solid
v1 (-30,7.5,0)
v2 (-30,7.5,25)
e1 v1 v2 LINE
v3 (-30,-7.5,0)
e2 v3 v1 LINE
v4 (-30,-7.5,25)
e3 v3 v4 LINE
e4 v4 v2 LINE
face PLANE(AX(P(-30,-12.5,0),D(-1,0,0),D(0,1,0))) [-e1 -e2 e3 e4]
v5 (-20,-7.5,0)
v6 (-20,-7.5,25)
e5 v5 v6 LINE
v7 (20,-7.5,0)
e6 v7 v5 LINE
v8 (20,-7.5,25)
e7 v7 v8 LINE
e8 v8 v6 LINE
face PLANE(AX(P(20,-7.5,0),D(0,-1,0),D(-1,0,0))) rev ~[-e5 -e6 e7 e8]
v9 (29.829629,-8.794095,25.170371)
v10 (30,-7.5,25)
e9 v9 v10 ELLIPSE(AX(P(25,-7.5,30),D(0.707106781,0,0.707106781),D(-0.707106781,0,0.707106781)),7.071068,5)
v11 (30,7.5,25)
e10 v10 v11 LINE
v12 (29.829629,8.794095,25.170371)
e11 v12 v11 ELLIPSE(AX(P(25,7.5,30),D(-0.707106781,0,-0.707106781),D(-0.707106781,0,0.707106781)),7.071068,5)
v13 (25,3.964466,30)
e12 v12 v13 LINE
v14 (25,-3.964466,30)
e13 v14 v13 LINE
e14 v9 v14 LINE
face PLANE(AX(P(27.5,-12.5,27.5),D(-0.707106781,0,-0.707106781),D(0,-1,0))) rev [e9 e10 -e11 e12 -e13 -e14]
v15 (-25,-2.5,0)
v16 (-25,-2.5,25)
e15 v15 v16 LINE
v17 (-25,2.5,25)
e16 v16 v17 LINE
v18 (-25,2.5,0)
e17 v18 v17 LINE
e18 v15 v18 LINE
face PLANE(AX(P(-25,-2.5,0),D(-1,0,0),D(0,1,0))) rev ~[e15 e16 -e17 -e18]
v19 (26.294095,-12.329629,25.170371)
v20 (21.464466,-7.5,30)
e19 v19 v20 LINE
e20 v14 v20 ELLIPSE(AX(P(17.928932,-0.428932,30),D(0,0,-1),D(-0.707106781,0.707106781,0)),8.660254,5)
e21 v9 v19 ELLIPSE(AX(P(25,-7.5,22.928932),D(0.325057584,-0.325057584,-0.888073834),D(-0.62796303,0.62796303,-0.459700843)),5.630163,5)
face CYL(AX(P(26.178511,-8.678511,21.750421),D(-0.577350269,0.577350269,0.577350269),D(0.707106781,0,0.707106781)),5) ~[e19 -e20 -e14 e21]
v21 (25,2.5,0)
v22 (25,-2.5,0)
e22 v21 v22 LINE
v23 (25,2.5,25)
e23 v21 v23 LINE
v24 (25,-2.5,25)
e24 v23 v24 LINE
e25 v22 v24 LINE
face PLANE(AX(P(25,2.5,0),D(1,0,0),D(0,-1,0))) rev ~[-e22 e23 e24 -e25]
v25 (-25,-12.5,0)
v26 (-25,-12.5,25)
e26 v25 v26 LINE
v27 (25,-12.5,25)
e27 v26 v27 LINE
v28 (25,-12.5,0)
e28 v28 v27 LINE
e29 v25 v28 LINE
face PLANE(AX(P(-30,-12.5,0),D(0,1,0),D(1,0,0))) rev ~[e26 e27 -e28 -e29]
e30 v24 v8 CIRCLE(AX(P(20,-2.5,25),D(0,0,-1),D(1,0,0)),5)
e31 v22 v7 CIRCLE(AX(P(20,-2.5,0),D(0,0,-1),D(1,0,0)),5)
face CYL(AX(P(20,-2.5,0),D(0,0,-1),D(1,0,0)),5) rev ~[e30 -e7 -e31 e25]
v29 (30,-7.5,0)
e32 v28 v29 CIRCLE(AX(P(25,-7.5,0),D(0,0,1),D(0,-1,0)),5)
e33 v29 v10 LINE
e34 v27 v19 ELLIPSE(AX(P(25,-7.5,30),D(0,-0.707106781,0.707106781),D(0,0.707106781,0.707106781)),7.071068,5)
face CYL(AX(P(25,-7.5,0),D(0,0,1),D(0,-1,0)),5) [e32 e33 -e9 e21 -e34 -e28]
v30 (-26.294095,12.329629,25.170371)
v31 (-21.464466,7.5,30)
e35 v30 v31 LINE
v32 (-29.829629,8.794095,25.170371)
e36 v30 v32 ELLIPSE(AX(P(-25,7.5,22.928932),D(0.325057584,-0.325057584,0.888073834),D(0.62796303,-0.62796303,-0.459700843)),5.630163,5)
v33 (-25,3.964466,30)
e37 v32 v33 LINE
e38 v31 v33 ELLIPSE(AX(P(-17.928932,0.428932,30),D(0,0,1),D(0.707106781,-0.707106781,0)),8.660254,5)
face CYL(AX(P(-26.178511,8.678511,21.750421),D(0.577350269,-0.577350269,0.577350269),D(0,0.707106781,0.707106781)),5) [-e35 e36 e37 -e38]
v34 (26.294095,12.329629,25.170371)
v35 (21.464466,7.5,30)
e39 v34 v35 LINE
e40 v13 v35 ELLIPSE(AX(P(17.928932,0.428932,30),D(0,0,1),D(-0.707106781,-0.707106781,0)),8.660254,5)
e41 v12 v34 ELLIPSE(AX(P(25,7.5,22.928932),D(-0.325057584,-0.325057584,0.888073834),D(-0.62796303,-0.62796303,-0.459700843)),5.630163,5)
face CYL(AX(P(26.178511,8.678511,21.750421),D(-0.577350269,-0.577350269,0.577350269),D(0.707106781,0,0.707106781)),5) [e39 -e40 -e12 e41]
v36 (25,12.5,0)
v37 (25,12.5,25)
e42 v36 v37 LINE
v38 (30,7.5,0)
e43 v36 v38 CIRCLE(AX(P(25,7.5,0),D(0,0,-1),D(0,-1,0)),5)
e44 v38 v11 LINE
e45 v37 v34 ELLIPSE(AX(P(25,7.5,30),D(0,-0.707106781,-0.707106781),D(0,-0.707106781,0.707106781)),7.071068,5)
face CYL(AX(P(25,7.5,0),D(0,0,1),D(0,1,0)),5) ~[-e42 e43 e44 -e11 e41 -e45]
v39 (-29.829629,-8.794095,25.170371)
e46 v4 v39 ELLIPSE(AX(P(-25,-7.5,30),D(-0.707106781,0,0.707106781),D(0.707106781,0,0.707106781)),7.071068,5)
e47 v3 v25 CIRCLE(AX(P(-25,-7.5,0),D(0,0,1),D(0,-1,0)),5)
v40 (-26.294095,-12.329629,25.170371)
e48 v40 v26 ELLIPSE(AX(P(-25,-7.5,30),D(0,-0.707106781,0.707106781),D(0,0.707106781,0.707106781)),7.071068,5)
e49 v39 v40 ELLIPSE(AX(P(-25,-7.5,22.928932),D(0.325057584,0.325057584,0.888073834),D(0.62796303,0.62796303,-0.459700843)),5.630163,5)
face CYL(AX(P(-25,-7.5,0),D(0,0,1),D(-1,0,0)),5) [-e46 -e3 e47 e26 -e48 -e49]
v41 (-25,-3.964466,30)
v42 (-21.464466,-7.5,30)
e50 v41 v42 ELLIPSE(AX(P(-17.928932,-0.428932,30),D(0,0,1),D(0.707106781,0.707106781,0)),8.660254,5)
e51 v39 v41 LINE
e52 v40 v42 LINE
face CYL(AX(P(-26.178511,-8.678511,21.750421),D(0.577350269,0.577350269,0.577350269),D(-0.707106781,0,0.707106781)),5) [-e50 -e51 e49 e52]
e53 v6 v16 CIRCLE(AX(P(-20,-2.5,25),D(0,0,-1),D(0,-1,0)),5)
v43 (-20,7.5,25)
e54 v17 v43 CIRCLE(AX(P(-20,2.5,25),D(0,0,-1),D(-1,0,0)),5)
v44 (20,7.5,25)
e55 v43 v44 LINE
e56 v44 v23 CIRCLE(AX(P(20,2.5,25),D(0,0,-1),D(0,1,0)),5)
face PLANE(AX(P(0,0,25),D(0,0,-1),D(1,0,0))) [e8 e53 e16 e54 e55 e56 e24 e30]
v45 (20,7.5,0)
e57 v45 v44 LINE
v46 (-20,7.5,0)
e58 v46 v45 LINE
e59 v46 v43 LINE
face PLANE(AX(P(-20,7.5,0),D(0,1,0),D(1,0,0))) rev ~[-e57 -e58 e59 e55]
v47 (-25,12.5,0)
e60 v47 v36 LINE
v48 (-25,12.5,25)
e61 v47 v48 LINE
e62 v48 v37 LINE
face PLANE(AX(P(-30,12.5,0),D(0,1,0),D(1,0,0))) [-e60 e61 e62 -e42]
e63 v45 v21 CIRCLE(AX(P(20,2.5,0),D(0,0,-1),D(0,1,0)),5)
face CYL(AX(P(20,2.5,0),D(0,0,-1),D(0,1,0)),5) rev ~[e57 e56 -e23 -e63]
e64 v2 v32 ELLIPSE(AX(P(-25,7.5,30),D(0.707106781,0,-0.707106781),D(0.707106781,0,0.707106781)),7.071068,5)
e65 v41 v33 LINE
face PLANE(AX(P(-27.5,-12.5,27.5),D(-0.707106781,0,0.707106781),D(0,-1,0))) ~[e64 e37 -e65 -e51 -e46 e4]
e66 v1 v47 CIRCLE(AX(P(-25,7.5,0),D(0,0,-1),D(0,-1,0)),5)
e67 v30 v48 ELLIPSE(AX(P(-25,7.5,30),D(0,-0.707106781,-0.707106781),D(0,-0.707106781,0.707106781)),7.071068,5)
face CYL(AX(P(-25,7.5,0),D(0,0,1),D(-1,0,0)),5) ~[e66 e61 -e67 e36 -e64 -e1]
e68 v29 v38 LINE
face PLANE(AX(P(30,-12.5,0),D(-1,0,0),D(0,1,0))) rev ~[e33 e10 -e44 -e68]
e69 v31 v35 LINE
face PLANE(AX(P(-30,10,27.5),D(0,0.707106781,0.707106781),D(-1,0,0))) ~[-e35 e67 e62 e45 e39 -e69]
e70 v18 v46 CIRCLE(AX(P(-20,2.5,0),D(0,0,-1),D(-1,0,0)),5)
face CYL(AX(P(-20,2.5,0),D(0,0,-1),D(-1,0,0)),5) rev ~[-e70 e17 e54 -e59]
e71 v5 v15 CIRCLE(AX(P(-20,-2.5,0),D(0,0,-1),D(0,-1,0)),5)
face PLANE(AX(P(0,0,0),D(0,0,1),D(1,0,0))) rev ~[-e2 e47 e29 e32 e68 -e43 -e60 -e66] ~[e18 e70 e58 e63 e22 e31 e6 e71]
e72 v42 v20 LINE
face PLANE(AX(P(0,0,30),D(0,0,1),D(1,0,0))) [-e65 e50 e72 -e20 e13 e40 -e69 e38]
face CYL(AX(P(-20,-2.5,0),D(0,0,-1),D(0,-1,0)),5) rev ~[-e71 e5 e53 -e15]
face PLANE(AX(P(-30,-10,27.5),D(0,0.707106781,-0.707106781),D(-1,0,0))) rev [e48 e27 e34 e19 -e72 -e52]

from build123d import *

# Parameters (mm, degrees)
F0_W     = 60
F0_H     = 25
F1_DEPTH = 30
F2_SIZE  = 5
F3_F1_R  = 5
F3_F2_R  = 5
F3_F3_R  = 5
F3_F4_R  = 5
F3_F5_R  = 5
F3_F6_R  = 5
F3_F7_R  = 5
F3_F8_R  = 5
F5_DEPTH = 25


with BuildPart() as f1:
    # F0 (on Top) → F1 (new body)
    with BuildSketch(Plane.XY):
        Rectangle(F0_W, F0_H)
    extrude(amount=F1_DEPTH)

    # F2
    f2_edges = [f1.edges().sort_by_distance(p)[0] for p in [
        (-30, 0, 30),
        (0, -12.5, 30),
        (30, 0, 30),
        (0, 12.5, 30),
    ]]
    chamfer(f2_edges, length=F2_SIZE)

    # F3: fillet of radius 5 on 8 edges, made by hand

    # F3_f1
    f3_f1_edges = [f1.edges().sort_by_distance(p)[0] for p in [
        (-30, 12.5, 12.5),
    ]]
    fillet(f3_f1_edges, radius=F3_F1_R)

    # F3_f2
    f3_f2_edges = [f1.edges().sort_by_distance(p)[0] for p in [
        (-30, -12.5, 12.5),
    ]]
    fillet(f3_f2_edges, radius=F3_F2_R)

    # F3_f3
    f3_f3_edges = [f1.edges().sort_by_distance(p)[0] for p in [
        (30, 12.5, 12.5),
    ]]
    fillet(f3_f3_edges, radius=F3_F3_R)

    # F3_f4
    f3_f4_edges = [f1.edges().sort_by_distance(p)[0] for p in [
        (-26.767766953, 9.267766953, 28.232233047),
    ]]
    fillet(f3_f4_edges, radius=F3_F4_R)

    # F3_f5
    f3_f5_edges = [f1.edges().sort_by_distance(p)[0] for p in [
        (-26.767766953, -9.267766953, 28.232233047),
    ]]
    fillet(f3_f5_edges, radius=F3_F5_R)

    # F3_f6
    f3_f6_edges = [f1.edges().sort_by_distance(p)[0] for p in [
        (30, -12.5, 12.5),
    ]]
    fillet(f3_f6_edges, radius=F3_F6_R)

    # F3_f7
    f3_f7_edges = [f1.edges().sort_by_distance(p)[0] for p in [
        (26.767766953, 9.267766953, 28.232233047),
    ]]
    fillet(f3_f7_edges, radius=F3_F7_R)

    # F3_f8
    f3_f8_edges = [f1.edges().sort_by_distance(p)[0] for p in [
        (26.767766953, -9.267766953, 28.232233047),
    ]]
    fillet(f3_f8_edges, radius=F3_F8_R)

    # F4 (on face) → F5 (cut)
    with BuildSketch(Plane(origin=(0, 0, 0), x_dir=(1, 0, 0), z_dir=(0, 0, -1))):
        with BuildLine():
            ThreePointArc((-25, -2.5), (-23.5355339059, -6.0355339059), (-20, -7.5))
            Line((-20, -7.5), (20, -7.5))
            ThreePointArc((20, -7.5), (23.5355339059, -6.0355339059), (25, -2.5))
            Line((25, -2.5), (25, 2.5))
            ThreePointArc((25, 2.5), (23.5355339059, 6.0355339059), (20, 7.5))
            Line((20, 7.5), (-20, 7.5))
            ThreePointArc((-20, 7.5), (-23.5355339059, 6.0355339059), (-25, 2.5))
            Line((-25, 2.5), (-25, -2.5))
        make_face()
    extrude(amount=-F5_DEPTH, mode=Mode.SUBTRACT)


solid = f1.part
